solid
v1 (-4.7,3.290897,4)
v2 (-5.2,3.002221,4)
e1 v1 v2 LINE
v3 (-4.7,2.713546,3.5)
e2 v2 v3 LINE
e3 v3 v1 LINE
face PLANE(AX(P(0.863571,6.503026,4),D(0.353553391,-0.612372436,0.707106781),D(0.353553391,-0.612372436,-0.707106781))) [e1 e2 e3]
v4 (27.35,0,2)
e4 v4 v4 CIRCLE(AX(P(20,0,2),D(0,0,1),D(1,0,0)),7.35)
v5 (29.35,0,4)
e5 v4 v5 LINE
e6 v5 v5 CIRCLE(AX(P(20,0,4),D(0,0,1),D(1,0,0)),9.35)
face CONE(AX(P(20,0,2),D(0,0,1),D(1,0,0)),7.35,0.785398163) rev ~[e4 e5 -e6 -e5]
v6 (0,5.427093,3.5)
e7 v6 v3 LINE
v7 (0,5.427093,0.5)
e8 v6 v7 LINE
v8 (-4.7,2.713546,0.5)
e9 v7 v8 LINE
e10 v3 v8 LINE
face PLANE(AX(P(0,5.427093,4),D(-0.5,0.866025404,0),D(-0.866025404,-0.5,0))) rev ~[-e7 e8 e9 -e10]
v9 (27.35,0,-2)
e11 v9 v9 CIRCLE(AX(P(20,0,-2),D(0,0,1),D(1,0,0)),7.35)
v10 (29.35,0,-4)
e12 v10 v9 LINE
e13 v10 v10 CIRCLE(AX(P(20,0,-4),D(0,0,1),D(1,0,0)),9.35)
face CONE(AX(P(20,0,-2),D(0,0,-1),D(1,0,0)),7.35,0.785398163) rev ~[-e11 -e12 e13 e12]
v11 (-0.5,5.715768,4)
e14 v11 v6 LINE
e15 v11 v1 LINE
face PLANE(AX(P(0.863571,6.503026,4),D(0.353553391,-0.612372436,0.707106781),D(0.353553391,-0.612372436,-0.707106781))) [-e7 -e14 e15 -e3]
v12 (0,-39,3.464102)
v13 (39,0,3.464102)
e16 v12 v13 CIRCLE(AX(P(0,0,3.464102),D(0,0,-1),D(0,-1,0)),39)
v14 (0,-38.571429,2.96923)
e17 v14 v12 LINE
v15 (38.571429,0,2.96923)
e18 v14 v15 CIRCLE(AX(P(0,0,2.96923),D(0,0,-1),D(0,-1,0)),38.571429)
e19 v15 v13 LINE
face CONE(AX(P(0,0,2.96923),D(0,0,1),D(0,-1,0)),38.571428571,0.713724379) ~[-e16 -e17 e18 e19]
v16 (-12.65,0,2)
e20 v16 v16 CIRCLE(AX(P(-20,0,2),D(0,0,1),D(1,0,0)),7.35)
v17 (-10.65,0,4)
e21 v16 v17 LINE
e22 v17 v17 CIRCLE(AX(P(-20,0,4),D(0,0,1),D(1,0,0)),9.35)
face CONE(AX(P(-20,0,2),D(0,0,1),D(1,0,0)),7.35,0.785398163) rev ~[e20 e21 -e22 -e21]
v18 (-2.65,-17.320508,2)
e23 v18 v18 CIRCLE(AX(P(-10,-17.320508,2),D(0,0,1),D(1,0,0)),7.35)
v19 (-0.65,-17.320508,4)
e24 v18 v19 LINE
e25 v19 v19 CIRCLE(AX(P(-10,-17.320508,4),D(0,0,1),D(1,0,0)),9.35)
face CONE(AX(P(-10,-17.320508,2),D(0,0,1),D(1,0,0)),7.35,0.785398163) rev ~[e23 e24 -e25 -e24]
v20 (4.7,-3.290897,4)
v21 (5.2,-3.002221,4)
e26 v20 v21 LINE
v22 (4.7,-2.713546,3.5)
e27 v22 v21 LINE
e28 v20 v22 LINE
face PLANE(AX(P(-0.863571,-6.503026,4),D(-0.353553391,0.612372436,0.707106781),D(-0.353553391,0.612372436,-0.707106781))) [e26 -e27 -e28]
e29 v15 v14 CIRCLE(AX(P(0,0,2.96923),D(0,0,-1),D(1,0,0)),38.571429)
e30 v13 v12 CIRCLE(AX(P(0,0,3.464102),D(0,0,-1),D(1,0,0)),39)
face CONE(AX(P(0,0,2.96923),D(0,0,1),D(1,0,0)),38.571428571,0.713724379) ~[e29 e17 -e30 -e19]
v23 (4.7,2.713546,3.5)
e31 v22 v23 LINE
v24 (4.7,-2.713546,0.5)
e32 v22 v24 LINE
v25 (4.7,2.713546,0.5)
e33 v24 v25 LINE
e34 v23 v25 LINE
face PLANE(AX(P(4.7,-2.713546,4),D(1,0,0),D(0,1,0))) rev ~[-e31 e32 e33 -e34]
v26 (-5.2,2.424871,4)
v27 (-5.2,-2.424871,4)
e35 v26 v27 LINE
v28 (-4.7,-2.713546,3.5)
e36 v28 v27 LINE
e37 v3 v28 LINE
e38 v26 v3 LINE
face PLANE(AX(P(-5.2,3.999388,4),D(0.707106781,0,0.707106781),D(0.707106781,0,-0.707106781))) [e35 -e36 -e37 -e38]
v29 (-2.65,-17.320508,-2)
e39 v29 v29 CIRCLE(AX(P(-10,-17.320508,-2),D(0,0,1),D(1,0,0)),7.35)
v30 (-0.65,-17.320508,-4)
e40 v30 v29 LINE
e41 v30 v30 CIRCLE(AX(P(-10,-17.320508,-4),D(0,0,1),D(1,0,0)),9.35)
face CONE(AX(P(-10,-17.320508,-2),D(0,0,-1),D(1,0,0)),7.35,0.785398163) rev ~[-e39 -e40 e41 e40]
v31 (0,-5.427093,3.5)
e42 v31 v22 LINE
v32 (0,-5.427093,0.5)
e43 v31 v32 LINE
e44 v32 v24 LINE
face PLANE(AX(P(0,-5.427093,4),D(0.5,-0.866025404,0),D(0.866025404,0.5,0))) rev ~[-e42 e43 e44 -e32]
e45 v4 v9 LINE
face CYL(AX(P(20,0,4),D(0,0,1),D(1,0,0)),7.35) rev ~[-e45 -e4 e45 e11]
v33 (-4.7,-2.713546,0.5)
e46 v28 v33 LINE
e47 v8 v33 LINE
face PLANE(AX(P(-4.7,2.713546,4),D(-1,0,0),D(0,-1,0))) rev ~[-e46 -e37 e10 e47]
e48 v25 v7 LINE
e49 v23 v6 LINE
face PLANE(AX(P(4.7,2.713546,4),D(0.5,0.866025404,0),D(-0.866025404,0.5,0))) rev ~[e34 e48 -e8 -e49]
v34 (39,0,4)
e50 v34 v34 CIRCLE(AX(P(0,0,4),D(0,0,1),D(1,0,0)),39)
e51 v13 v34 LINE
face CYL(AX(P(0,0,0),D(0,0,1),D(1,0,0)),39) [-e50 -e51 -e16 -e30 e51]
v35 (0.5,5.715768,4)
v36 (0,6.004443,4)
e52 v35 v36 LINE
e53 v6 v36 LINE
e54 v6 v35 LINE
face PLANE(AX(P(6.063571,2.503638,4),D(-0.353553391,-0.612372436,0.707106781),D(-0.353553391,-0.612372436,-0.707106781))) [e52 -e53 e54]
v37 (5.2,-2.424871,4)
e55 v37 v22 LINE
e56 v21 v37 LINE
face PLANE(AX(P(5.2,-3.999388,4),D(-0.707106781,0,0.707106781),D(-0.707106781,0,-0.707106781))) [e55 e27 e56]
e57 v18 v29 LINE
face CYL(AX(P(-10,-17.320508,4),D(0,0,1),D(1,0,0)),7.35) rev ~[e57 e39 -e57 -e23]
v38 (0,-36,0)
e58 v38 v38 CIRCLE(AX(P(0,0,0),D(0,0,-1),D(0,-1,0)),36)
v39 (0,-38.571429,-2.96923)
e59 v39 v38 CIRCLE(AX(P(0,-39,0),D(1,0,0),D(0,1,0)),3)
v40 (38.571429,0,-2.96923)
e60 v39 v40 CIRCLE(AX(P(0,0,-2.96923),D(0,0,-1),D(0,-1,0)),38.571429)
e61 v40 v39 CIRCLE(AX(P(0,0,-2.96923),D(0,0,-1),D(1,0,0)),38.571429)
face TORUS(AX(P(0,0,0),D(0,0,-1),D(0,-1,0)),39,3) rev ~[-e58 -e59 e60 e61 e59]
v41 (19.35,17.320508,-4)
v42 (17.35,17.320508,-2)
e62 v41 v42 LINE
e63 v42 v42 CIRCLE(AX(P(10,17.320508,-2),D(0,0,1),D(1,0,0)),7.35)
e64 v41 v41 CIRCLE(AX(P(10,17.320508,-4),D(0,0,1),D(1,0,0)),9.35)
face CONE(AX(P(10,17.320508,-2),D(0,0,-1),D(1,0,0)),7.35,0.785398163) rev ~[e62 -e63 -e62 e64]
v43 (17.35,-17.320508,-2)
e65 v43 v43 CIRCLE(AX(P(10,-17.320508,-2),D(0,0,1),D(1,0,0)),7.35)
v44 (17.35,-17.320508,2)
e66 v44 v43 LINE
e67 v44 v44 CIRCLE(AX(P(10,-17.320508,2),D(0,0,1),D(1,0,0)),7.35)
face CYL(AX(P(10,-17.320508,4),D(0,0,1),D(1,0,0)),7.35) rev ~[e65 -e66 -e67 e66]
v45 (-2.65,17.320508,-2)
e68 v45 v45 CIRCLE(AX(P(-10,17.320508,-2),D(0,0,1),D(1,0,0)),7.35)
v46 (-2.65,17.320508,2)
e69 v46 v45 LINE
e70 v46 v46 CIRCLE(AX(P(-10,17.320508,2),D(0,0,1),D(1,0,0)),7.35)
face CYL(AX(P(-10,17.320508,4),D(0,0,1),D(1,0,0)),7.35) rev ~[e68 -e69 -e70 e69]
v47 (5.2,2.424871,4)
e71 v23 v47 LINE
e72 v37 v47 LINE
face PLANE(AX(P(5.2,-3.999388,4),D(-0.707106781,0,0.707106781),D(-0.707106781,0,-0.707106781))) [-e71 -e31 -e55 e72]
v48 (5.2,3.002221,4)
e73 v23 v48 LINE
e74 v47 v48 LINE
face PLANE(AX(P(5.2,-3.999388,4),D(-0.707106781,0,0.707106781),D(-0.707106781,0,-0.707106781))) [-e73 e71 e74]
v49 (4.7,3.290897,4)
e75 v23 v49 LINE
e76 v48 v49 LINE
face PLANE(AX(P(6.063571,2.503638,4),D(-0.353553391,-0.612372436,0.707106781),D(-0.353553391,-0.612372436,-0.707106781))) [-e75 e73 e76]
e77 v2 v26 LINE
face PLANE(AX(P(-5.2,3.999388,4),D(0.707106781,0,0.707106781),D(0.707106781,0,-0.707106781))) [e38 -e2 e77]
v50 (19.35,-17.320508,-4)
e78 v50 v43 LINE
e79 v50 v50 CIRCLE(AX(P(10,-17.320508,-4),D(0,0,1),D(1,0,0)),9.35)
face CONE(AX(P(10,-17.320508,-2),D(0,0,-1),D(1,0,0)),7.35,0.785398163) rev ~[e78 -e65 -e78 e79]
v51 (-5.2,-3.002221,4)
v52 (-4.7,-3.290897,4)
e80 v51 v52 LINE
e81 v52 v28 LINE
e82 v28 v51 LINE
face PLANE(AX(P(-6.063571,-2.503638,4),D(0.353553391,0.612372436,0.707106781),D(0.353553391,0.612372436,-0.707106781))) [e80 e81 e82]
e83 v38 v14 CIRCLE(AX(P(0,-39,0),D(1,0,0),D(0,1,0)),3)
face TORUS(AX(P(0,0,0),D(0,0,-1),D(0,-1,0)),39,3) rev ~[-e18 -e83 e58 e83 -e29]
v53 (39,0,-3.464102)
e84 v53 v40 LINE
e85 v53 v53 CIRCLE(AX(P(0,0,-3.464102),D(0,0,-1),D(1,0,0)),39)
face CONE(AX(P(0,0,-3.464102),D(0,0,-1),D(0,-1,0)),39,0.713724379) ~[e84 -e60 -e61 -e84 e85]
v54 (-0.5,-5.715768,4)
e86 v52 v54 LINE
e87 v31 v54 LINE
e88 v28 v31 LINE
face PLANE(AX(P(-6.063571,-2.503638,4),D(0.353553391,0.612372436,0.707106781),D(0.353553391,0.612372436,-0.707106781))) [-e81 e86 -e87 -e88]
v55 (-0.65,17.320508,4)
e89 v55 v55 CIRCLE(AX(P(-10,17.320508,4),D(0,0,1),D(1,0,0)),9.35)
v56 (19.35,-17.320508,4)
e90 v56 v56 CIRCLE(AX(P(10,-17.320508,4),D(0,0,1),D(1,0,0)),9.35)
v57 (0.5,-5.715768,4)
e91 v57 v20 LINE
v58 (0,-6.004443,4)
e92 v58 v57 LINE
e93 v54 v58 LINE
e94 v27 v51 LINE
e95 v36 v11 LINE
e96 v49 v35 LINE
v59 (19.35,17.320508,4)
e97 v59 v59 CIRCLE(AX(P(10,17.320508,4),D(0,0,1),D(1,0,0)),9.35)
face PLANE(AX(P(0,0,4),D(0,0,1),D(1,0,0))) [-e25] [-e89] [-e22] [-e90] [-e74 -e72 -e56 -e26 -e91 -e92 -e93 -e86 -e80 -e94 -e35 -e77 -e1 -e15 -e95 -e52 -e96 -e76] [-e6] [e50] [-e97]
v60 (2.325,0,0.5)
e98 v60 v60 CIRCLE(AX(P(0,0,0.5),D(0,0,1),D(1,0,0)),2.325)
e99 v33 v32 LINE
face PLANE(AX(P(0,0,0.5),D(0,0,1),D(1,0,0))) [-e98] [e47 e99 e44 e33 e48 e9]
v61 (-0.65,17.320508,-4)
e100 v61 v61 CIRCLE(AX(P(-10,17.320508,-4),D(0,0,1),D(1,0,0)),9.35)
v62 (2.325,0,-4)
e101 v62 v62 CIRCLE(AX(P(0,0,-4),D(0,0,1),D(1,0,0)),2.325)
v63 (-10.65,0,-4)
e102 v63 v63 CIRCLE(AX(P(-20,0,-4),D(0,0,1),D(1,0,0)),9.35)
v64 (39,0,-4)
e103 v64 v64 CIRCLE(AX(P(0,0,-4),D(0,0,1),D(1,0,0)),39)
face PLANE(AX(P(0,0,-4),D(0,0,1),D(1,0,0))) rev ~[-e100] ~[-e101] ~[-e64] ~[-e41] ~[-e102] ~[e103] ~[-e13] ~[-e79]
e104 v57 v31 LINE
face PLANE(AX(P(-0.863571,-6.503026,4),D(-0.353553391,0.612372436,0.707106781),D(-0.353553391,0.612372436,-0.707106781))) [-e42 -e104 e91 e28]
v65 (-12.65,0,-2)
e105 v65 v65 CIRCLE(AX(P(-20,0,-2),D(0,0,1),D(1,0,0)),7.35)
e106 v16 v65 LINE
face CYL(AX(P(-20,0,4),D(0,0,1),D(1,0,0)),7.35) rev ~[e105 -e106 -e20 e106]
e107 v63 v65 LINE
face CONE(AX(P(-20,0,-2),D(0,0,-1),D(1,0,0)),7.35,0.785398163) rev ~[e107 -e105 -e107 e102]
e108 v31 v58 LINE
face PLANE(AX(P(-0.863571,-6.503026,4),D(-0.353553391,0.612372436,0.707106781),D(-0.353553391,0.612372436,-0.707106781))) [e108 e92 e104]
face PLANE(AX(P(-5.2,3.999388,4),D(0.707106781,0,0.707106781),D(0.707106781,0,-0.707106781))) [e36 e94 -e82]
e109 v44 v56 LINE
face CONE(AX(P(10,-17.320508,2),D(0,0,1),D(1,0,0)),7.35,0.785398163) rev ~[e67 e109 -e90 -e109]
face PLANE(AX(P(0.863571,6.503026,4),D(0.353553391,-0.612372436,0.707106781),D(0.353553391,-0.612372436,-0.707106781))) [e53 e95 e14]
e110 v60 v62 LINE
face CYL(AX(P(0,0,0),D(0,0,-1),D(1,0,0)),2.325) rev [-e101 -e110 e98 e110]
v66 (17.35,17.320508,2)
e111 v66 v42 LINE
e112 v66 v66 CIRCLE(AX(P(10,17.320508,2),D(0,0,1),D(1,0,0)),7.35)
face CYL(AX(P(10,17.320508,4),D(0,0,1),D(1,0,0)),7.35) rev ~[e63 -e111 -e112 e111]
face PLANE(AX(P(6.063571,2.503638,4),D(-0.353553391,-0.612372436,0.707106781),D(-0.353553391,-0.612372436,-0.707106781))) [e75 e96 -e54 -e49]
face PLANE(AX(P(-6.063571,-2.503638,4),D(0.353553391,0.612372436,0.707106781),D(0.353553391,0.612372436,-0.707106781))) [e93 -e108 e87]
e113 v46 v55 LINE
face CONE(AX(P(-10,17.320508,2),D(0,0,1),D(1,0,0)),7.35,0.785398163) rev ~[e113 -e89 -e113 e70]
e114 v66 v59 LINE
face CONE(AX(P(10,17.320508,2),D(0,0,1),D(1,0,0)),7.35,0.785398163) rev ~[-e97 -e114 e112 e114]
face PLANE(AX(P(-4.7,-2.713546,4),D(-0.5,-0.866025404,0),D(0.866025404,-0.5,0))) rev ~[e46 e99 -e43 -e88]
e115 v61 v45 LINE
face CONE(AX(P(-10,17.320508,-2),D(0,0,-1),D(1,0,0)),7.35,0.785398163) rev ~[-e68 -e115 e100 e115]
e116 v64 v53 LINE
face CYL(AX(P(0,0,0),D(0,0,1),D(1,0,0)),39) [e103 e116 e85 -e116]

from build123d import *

# Parameters (mm, degrees)
F0_R          = 39
F0_R_2        = 2.325
F1_DEPTH      = 4
F2_R          = 3
F4_R          = 2.325
F5_DEPTH      = 3.5
F6_T4_DEPTH   = 7.9987755183
F6_T10_DEPTH  = 7.9987755183
F6_T16_DEPTH  = 7.9987755183
F6_T22_DEPTH  = 7.9987755183
F6_T28_DEPTH  = 7.9987755183
F6_T34_DEPTH  = 7.9987755183
F6_T38_ANGLE  = 270
F6_T40_ANGLE  = 90
F6_T42_ANGLE  = 90
F6_T44_ANGLE  = 270
F6_T49_DEPTH  = 7.9987755183
F6_T53_DEPTH  = 7.9987755183
F6_T60_DEPTH  = 7.9987755183
F6_T64_DEPTH  = 7.9987755183
F6_T71_DEPTH  = 7.9987755183
F6_T75_DEPTH  = 7.9987755183
F6_T82_DEPTH  = 7.9987755183
F6_T86_DEPTH  = 7.9987755183
F6_T93_DEPTH  = 7.9987755183
F6_T97_DEPTH  = 7.9987755183
F6_T104_DEPTH = 7.9987755183
F6_T108_DEPTH = 7.9987755183
F7_R          = 7.35
F8_DEPTH      = 25
F9_SIZE       = 2


# Not quite as in the source:
# - a fillet or chamfer that OpenCascade refuses, or shapes differently, is made with other operations: its cross-section is extruded or revolved along the edge and cut away or added


with BuildPart() as f1:
    # F0 (on Top) → F1 (new body, symmetric)
    with BuildSketch(Plane.XY):
        Circle(F0_R)
        Circle(F0_R_2, mode=Mode.SUBTRACT)
    extrude(amount=F1_DEPTH, both=True)

    # F2 (on Right) → F3 (revolve, cut)
    with BuildSketch(Plane.YZ):
        with Locations((-39, 0)):
            Circle(F2_R)
    revolve(axis=Axis((0, 0, 0), (0, 0, -1)), mode=Mode.SUBTRACT)

    # F4 (on face) → F5 (cut)
    with BuildSketch(Plane.XY.offset(4)):
        Polygon((-4.7, 2.7135462652), (-4.7, -2.7135462652), (0, -5.4270925304), (4.7, -2.7135462652), (4.7, 2.7135462652), (0, 5.4270925304), align=None)
        Circle(F4_R, mode=Mode.SUBTRACT)
    extrude(amount=-F5_DEPTH, mode=Mode.SUBTRACT)

    # F6: chamfer of 0.5 on 10 edges, made by hand


with BuildPart() as f6_tool2:
    # F6_s3 → F6_t4 (new body)
    with BuildSketch(Plane(origin=(3.463571399, -1.9996938796, 0), x_dir=(0, 0, 1), z_dir=(-0.8660254038, 0.5, 0))):
        Polygon((4, 5.2), (3.5, 4.7), (4, 4.7), align=None)
    extrude(amount=F6_T4_DEPTH)

    split(bisect_by=Plane.YZ.offset(4.7), keep=Keep.BOTTOM)

    split(bisect_by=Plane(origin=(-2.35, 4.0703193978, 0), x_dir=(0, 0, 1), z_dir=(0.5, -0.8660254038, 0)), keep=Keep.TOP)


with BuildPart() as f1_1:
    add(f1.part)

    # F6_t1: cut F6_tool2
    add(f6_tool2.part, mode=Mode.SUBTRACT)


with BuildPart() as f6_tool8:
    # F6_s9 → F6_t10 (new body)
    with BuildSketch(Plane.XZ.offset(3.9993877592)):
        Polygon((5.2, 4), (4.7, 3.5), (4.7, 4), align=None)
    extrude(amount=-F6_T10_DEPTH)

    split(bisect_by=Plane(origin=(2.35, -4.0703193978, 0), x_dir=(0, 0, 1), z_dir=(-0.5, 0.8660254038, 0)), keep=Keep.TOP)

    split(bisect_by=Plane(origin=(2.35, 4.0703193978, 0), x_dir=(0, 0, 1), z_dir=(-0.5, -0.8660254038, 0)), keep=Keep.TOP)


with BuildPart() as f1_2:
    add(f1_1.part)

    # F6_t7: cut F6_tool8
    add(f6_tool8.part, mode=Mode.SUBTRACT)


with BuildPart() as f6_tool14:
    # F6_s15 → F6_t16 (new body)
    with BuildSketch(Plane(origin=(-3.463571399, -1.9996938796, 0), x_dir=(0, 0, 1), z_dir=(0.8660254038, 0.5, 0))):
        Polygon((4, 5.2), (3.5, 4.7), (4, 4.7), align=None)
    extrude(amount=F6_T16_DEPTH)

    split(bisect_by=Plane(origin=(-2.35, -4.0703193978, 0), x_dir=(0, 0, 1), z_dir=(0.5, 0.8660254038, 0)), keep=Keep.TOP)

    split(bisect_by=Plane.YZ.offset(4.7), keep=Keep.BOTTOM)


with BuildPart() as f1_3:
    add(f1_2.part)

    # F6_t13: cut F6_tool14
    add(f6_tool14.part, mode=Mode.SUBTRACT)


with BuildPart() as f6_tool20:
    # F6_s21 → F6_t22 (new body)
    with BuildSketch(Plane(origin=(-3.463571399, 1.9996938796, 0), x_dir=(0, 0, 1), z_dir=(0.8660254038, -0.5, 0))):
        Polygon((4, 5.2), (3.5, 4.7), (4, 4.7), align=None)
    extrude(amount=F6_T22_DEPTH)

    split(bisect_by=Plane.YZ.offset(-4.7), keep=Keep.TOP)

    split(bisect_by=Plane(origin=(2.35, -4.0703193978, 0), x_dir=(0, 0, 1), z_dir=(-0.5, 0.8660254038, 0)), keep=Keep.TOP)


with BuildPart() as f1_4:
    add(f1_3.part)

    # F6_t19: cut F6_tool20
    add(f6_tool20.part, mode=Mode.SUBTRACT)


with BuildPart() as f6_tool26:
    # F6_s27 → F6_t28 (new body)
    with BuildSketch(Plane.XZ.offset(-3.9993877592)):
        Polygon((-5.2, 4), (-4.7, 3.5), (-4.7, 4), align=None)
    extrude(amount=F6_T28_DEPTH)

    split(bisect_by=Plane(origin=(-2.35, -4.0703193978, 0), x_dir=(0, 0, 1), z_dir=(0.5, 0.8660254038, 0)), keep=Keep.TOP)

    split(bisect_by=Plane(origin=(-2.35, 4.0703193978, 0), x_dir=(0, 0, 1), z_dir=(0.5, -0.8660254038, 0)), keep=Keep.TOP)


with BuildPart() as f1_5:
    add(f1_4.part)

    # F6_t25: cut F6_tool26
    add(f6_tool26.part, mode=Mode.SUBTRACT)


with BuildPart() as f6_tool32:
    # F6_s33 → F6_t34 (new body)
    with BuildSketch(Plane(origin=(3.463571399, 1.9996938796, 0), x_dir=(0, 0, 1), z_dir=(-0.8660254038, -0.5, 0))):
        Polygon((4, 5.2), (3.5, 4.7), (4, 4.7), align=None)
    extrude(amount=F6_T34_DEPTH)

    split(bisect_by=Plane.YZ.offset(-4.7), keep=Keep.TOP)

    split(bisect_by=Plane(origin=(2.35, 4.0703193978, 0), x_dir=(0, 0, 1), z_dir=(-0.5, -0.8660254038, 0)), keep=Keep.TOP)


with BuildPart() as f1_6:
    add(f1_5.part)

    # F6_t31: cut F6_tool32
    add(f6_tool32.part, mode=Mode.SUBTRACT)

    # F6_s37 → F6_t38 (revolve, cut)
    with BuildSketch(Plane.YZ):
        with BuildLine():
            Line((-39, -3.4641016151), (-38.5714285714, -2.9692299558))
            ThreePointArc((-38.5714285714, -2.9692299558), (-38.7780755038, -2.9917803258), (-39, -3))
            Line((-39, -3), (-39, -3.4641016151))
        make_face()
    revolve(axis=Axis((0, 0, -3), (0, 0, -1)), revolution_arc=F6_T38_ANGLE, mode=Mode.SUBTRACT)

    # F6_s39 → F6_t40 (revolve, cut)
    with BuildSketch(Plane.XZ):
        with BuildLine():
            Line((39, -3.4641016151), (38.5714285714, -2.9692299558))
            ThreePointArc((38.5714285714, -2.9692299558), (38.7780755038, -2.9917803258), (39, -3))
            Line((39, -3), (39, -3.4641016151))
        make_face()
    revolve(axis=Axis((0, 0, -3), (0, 0, -1)), revolution_arc=F6_T40_ANGLE, mode=Mode.SUBTRACT)

    # F6_s41 → F6_t42 (revolve, cut)
    with BuildSketch(Plane.XZ):
        with BuildLine():
            Line((38.5714285714, 2.9692299558), (39, 3.4641016151))
            Line((39, 3.4641016151), (39, 3))
            ThreePointArc((39, 3), (38.7780755038, 2.9917803258), (38.5714285714, 2.9692299558))
        make_face()
    revolve(axis=Axis((0, 0, 3), (0, 0, -1)), revolution_arc=F6_T42_ANGLE, mode=Mode.SUBTRACT)

    # F6_s43 → F6_t44 (revolve, cut)
    with BuildSketch(Plane.YZ):
        with BuildLine():
            Line((-38.5714285714, 2.9692299558), (-39, 3.4641016151))
            Line((-39, 3.4641016151), (-39, 3))
            ThreePointArc((-39, 3), (-38.7780755038, 2.9917803258), (-38.5714285714, 2.9692299558))
        make_face()
    revolve(axis=Axis((0, 0, 3), (0, 0, -1)), revolution_arc=F6_T44_ANGLE, mode=Mode.SUBTRACT)


with BuildPart() as f6_tool47:
    # F6_s48 → F6_t49 (new body)
    with BuildSketch(Plane.XZ.offset(3.9993877592)):
        Polygon((5.2, 4), (4.7, 3.5), (4.7, 4), align=None)
    extrude(amount=-F6_T49_DEPTH)

    split(bisect_by=Plane(origin=(2.35, 4.0703193978, 0), x_dir=(0, 0, 1), z_dir=(0.5, 0.8660254038, 0)), keep=Keep.TOP)


with BuildPart() as f6_tool51:
    # F6_s52 → F6_t53 (new body)
    with BuildSketch(Plane(origin=(3.463571399, -1.9996938796, 0), x_dir=(0, 0, 1), z_dir=(-0.8660254038, 0.5, 0))):
        Polygon((4, 5.2), (3.5, 4.7), (4, 4.7), align=None)
    extrude(amount=F6_T53_DEPTH)

    split(bisect_by=Plane.YZ.offset(4.7), keep=Keep.TOP)


with BuildPart() as f6_tool47_1:
    add(f6_tool47.part)

    # F6_t55: intersect F6_tool51
    add(f6_tool51.part, mode=Mode.INTERSECT)


with BuildPart() as f1_7:
    add(f1_6.part)

    # F6_t45: cut F6_tool47
    add(f6_tool47_1.part, mode=Mode.SUBTRACT)


with BuildPart() as f6_tool58:
    # F6_s59 → F6_t60 (new body)
    with BuildSketch(Plane(origin=(3.463571399, -1.9996938796, 0), x_dir=(0, 0, 1), z_dir=(-0.8660254038, 0.5, 0))):
        Polygon((4, 5.2), (3.5, 4.7), (4, 4.7), align=None)
    extrude(amount=F6_T60_DEPTH)

    split(bisect_by=Plane(origin=(-2.35, 4.0703193978, 0), x_dir=(0, 0, 1), z_dir=(-0.5, 0.8660254038, 0)), keep=Keep.TOP)


with BuildPart() as f6_tool62:
    # F6_s63 → F6_t64 (new body)
    with BuildSketch(Plane(origin=(3.463571399, 1.9996938796, 0), x_dir=(0, 0, 1), z_dir=(-0.8660254038, -0.5, 0))):
        Polygon((4, 5.2), (3.5, 4.7), (4, 4.7), align=None)
    extrude(amount=F6_T64_DEPTH)

    split(bisect_by=Plane(origin=(2.35, 4.0703193978, 0), x_dir=(0, 0, 1), z_dir=(0.5, 0.8660254038, 0)), keep=Keep.TOP)


with BuildPart() as f6_tool58_1:
    add(f6_tool58.part)

    # F6_t66: intersect F6_tool62
    add(f6_tool62.part, mode=Mode.INTERSECT)


with BuildPart() as f1_8:
    add(f1_7.part)

    # F6_t56: cut F6_tool58
    add(f6_tool58_1.part, mode=Mode.SUBTRACT)


with BuildPart() as f6_tool69:
    # F6_s70 → F6_t71 (new body)
    with BuildSketch(Plane(origin=(-3.463571399, -1.9996938796, 0), x_dir=(0, 0, 1), z_dir=(0.8660254038, 0.5, 0))):
        Polygon((4, 5.2), (3.5, 4.7), (4, 4.7), align=None)
    extrude(amount=F6_T71_DEPTH)

    split(bisect_by=Plane.YZ.offset(4.7), keep=Keep.TOP)


with BuildPart() as f6_tool73:
    # F6_s74 → F6_t75 (new body)
    with BuildSketch(Plane.XZ.offset(3.9993877592)):
        Polygon((5.2, 4), (4.7, 3.5), (4.7, 4), align=None)
    extrude(amount=-F6_T75_DEPTH)

    split(bisect_by=Plane(origin=(2.35, -4.0703193978, 0), x_dir=(0, 0, 1), z_dir=(0.5, -0.8660254038, 0)), keep=Keep.TOP)


with BuildPart() as f6_tool69_1:
    add(f6_tool69.part)

    # F6_t77: intersect F6_tool73
    add(f6_tool73.part, mode=Mode.INTERSECT)


with BuildPart() as f1_9:
    add(f1_8.part)

    # F6_t67: cut F6_tool69
    add(f6_tool69_1.part, mode=Mode.SUBTRACT)


with BuildPart() as f6_tool80:
    # F6_s81 → F6_t82 (new body)
    with BuildSketch(Plane(origin=(-3.463571399, 1.9996938796, 0), x_dir=(0, 0, 1), z_dir=(0.8660254038, -0.5, 0))):
        Polygon((4, 5.2), (3.5, 4.7), (4, 4.7), align=None)
    extrude(amount=F6_T82_DEPTH)

    split(bisect_by=Plane(origin=(2.35, -4.0703193978, 0), x_dir=(0, 0, 1), z_dir=(0.5, -0.8660254038, 0)), keep=Keep.TOP)


with BuildPart() as f6_tool84:
    # F6_s85 → F6_t86 (new body)
    with BuildSketch(Plane(origin=(-3.463571399, -1.9996938796, 0), x_dir=(0, 0, 1), z_dir=(0.8660254038, 0.5, 0))):
        Polygon((4, 5.2), (3.5, 4.7), (4, 4.7), align=None)
    extrude(amount=F6_T86_DEPTH)

    split(bisect_by=Plane(origin=(-2.35, -4.0703193978, 0), x_dir=(0, 0, 1), z_dir=(-0.5, -0.8660254038, 0)), keep=Keep.TOP)


with BuildPart() as f6_tool80_1:
    add(f6_tool80.part)

    # F6_t88: intersect F6_tool84
    add(f6_tool84.part, mode=Mode.INTERSECT)


with BuildPart() as f1_10:
    add(f1_9.part)

    # F6_t78: cut F6_tool80
    add(f6_tool80_1.part, mode=Mode.SUBTRACT)


with BuildPart() as f6_tool91:
    # F6_s92 → F6_t93 (new body)
    with BuildSketch(Plane.XZ.offset(-3.9993877592)):
        Polygon((-5.2, 4), (-4.7, 3.5), (-4.7, 4), align=None)
    extrude(amount=F6_T93_DEPTH)

    split(bisect_by=Plane(origin=(-2.35, -4.0703193978, 0), x_dir=(0, 0, 1), z_dir=(-0.5, -0.8660254038, 0)), keep=Keep.TOP)


with BuildPart() as f6_tool95:
    # F6_s96 → F6_t97 (new body)
    with BuildSketch(Plane(origin=(-3.463571399, 1.9996938796, 0), x_dir=(0, 0, 1), z_dir=(0.8660254038, -0.5, 0))):
        Polygon((4, 5.2), (3.5, 4.7), (4, 4.7), align=None)
    extrude(amount=F6_T97_DEPTH)

    split(bisect_by=Plane.YZ.offset(-4.7), keep=Keep.BOTTOM)


with BuildPart() as f6_tool91_1:
    add(f6_tool91.part)

    # F6_t99: intersect F6_tool95
    add(f6_tool95.part, mode=Mode.INTERSECT)


with BuildPart() as f1_11:
    add(f1_10.part)

    # F6_t89: cut F6_tool91
    add(f6_tool91_1.part, mode=Mode.SUBTRACT)


with BuildPart() as f6_tool102:
    # F6_s103 → F6_t104 (new body)
    with BuildSketch(Plane.XZ.offset(-3.9993877592)):
        Polygon((-5.2, 4), (-4.7, 3.5), (-4.7, 4), align=None)
    extrude(amount=F6_T104_DEPTH)

    split(bisect_by=Plane(origin=(-2.35, 4.0703193978, 0), x_dir=(0, 0, 1), z_dir=(-0.5, 0.8660254038, 0)), keep=Keep.TOP)


with BuildPart() as f6_tool106:
    # F6_s107 → F6_t108 (new body)
    with BuildSketch(Plane(origin=(3.463571399, 1.9996938796, 0), x_dir=(0, 0, 1), z_dir=(-0.8660254038, -0.5, 0))):
        Polygon((4, 5.2), (3.5, 4.7), (4, 4.7), align=None)
    extrude(amount=F6_T108_DEPTH)

    split(bisect_by=Plane.YZ.offset(-4.7), keep=Keep.BOTTOM)


with BuildPart() as f6_tool102_1:
    add(f6_tool102.part)

    # F6_t110: intersect F6_tool106
    add(f6_tool106.part, mode=Mode.INTERSECT)


with BuildPart() as f1_12:
    add(f1_11.part)

    # F6_t100: cut F6_tool102
    add(f6_tool102_1.part, mode=Mode.SUBTRACT)

    # F7 (on face) → F8 (cut)
    with BuildSketch(Plane.XY.offset(4)):
        with Locations((20, 0)):
            Circle(F7_R)
        with Locations((10, -17.3205080757)):
            Circle(F7_R)
        with Locations((-10, -17.3205080757)):
            Circle(F7_R)
        with Locations((-20, 0)):
            Circle(F7_R)
        with Locations((-10, 17.3205080757)):
            Circle(F7_R)
        with Locations((10, 17.3205080757)):
            Circle(F7_R)
    extrude(amount=-F8_DEPTH, mode=Mode.SUBTRACT)

    # F9
    f9_edges = [f1_12.edges().sort_by_distance(p)[0] for p in [
        (12.65, 0, 4),
        (2.65, -17.320508, 4),
        (-17.35, -17.320508, 4),
        (-27.35, 0, 4),
        (-17.35, 17.320508, 4),
        (2.65, 17.320508, 4),
        (-27.35, 0, -4),
        (-17.35, -17.320508, -4),
        (2.65, -17.320508, -4),
        (12.65, 0, -4),
        (2.65, 17.320508, -4),
        (-17.35, 17.320508, -4),
    ]]
    chamfer(f9_edges, length=F9_SIZE)


solid = f1_12.part
